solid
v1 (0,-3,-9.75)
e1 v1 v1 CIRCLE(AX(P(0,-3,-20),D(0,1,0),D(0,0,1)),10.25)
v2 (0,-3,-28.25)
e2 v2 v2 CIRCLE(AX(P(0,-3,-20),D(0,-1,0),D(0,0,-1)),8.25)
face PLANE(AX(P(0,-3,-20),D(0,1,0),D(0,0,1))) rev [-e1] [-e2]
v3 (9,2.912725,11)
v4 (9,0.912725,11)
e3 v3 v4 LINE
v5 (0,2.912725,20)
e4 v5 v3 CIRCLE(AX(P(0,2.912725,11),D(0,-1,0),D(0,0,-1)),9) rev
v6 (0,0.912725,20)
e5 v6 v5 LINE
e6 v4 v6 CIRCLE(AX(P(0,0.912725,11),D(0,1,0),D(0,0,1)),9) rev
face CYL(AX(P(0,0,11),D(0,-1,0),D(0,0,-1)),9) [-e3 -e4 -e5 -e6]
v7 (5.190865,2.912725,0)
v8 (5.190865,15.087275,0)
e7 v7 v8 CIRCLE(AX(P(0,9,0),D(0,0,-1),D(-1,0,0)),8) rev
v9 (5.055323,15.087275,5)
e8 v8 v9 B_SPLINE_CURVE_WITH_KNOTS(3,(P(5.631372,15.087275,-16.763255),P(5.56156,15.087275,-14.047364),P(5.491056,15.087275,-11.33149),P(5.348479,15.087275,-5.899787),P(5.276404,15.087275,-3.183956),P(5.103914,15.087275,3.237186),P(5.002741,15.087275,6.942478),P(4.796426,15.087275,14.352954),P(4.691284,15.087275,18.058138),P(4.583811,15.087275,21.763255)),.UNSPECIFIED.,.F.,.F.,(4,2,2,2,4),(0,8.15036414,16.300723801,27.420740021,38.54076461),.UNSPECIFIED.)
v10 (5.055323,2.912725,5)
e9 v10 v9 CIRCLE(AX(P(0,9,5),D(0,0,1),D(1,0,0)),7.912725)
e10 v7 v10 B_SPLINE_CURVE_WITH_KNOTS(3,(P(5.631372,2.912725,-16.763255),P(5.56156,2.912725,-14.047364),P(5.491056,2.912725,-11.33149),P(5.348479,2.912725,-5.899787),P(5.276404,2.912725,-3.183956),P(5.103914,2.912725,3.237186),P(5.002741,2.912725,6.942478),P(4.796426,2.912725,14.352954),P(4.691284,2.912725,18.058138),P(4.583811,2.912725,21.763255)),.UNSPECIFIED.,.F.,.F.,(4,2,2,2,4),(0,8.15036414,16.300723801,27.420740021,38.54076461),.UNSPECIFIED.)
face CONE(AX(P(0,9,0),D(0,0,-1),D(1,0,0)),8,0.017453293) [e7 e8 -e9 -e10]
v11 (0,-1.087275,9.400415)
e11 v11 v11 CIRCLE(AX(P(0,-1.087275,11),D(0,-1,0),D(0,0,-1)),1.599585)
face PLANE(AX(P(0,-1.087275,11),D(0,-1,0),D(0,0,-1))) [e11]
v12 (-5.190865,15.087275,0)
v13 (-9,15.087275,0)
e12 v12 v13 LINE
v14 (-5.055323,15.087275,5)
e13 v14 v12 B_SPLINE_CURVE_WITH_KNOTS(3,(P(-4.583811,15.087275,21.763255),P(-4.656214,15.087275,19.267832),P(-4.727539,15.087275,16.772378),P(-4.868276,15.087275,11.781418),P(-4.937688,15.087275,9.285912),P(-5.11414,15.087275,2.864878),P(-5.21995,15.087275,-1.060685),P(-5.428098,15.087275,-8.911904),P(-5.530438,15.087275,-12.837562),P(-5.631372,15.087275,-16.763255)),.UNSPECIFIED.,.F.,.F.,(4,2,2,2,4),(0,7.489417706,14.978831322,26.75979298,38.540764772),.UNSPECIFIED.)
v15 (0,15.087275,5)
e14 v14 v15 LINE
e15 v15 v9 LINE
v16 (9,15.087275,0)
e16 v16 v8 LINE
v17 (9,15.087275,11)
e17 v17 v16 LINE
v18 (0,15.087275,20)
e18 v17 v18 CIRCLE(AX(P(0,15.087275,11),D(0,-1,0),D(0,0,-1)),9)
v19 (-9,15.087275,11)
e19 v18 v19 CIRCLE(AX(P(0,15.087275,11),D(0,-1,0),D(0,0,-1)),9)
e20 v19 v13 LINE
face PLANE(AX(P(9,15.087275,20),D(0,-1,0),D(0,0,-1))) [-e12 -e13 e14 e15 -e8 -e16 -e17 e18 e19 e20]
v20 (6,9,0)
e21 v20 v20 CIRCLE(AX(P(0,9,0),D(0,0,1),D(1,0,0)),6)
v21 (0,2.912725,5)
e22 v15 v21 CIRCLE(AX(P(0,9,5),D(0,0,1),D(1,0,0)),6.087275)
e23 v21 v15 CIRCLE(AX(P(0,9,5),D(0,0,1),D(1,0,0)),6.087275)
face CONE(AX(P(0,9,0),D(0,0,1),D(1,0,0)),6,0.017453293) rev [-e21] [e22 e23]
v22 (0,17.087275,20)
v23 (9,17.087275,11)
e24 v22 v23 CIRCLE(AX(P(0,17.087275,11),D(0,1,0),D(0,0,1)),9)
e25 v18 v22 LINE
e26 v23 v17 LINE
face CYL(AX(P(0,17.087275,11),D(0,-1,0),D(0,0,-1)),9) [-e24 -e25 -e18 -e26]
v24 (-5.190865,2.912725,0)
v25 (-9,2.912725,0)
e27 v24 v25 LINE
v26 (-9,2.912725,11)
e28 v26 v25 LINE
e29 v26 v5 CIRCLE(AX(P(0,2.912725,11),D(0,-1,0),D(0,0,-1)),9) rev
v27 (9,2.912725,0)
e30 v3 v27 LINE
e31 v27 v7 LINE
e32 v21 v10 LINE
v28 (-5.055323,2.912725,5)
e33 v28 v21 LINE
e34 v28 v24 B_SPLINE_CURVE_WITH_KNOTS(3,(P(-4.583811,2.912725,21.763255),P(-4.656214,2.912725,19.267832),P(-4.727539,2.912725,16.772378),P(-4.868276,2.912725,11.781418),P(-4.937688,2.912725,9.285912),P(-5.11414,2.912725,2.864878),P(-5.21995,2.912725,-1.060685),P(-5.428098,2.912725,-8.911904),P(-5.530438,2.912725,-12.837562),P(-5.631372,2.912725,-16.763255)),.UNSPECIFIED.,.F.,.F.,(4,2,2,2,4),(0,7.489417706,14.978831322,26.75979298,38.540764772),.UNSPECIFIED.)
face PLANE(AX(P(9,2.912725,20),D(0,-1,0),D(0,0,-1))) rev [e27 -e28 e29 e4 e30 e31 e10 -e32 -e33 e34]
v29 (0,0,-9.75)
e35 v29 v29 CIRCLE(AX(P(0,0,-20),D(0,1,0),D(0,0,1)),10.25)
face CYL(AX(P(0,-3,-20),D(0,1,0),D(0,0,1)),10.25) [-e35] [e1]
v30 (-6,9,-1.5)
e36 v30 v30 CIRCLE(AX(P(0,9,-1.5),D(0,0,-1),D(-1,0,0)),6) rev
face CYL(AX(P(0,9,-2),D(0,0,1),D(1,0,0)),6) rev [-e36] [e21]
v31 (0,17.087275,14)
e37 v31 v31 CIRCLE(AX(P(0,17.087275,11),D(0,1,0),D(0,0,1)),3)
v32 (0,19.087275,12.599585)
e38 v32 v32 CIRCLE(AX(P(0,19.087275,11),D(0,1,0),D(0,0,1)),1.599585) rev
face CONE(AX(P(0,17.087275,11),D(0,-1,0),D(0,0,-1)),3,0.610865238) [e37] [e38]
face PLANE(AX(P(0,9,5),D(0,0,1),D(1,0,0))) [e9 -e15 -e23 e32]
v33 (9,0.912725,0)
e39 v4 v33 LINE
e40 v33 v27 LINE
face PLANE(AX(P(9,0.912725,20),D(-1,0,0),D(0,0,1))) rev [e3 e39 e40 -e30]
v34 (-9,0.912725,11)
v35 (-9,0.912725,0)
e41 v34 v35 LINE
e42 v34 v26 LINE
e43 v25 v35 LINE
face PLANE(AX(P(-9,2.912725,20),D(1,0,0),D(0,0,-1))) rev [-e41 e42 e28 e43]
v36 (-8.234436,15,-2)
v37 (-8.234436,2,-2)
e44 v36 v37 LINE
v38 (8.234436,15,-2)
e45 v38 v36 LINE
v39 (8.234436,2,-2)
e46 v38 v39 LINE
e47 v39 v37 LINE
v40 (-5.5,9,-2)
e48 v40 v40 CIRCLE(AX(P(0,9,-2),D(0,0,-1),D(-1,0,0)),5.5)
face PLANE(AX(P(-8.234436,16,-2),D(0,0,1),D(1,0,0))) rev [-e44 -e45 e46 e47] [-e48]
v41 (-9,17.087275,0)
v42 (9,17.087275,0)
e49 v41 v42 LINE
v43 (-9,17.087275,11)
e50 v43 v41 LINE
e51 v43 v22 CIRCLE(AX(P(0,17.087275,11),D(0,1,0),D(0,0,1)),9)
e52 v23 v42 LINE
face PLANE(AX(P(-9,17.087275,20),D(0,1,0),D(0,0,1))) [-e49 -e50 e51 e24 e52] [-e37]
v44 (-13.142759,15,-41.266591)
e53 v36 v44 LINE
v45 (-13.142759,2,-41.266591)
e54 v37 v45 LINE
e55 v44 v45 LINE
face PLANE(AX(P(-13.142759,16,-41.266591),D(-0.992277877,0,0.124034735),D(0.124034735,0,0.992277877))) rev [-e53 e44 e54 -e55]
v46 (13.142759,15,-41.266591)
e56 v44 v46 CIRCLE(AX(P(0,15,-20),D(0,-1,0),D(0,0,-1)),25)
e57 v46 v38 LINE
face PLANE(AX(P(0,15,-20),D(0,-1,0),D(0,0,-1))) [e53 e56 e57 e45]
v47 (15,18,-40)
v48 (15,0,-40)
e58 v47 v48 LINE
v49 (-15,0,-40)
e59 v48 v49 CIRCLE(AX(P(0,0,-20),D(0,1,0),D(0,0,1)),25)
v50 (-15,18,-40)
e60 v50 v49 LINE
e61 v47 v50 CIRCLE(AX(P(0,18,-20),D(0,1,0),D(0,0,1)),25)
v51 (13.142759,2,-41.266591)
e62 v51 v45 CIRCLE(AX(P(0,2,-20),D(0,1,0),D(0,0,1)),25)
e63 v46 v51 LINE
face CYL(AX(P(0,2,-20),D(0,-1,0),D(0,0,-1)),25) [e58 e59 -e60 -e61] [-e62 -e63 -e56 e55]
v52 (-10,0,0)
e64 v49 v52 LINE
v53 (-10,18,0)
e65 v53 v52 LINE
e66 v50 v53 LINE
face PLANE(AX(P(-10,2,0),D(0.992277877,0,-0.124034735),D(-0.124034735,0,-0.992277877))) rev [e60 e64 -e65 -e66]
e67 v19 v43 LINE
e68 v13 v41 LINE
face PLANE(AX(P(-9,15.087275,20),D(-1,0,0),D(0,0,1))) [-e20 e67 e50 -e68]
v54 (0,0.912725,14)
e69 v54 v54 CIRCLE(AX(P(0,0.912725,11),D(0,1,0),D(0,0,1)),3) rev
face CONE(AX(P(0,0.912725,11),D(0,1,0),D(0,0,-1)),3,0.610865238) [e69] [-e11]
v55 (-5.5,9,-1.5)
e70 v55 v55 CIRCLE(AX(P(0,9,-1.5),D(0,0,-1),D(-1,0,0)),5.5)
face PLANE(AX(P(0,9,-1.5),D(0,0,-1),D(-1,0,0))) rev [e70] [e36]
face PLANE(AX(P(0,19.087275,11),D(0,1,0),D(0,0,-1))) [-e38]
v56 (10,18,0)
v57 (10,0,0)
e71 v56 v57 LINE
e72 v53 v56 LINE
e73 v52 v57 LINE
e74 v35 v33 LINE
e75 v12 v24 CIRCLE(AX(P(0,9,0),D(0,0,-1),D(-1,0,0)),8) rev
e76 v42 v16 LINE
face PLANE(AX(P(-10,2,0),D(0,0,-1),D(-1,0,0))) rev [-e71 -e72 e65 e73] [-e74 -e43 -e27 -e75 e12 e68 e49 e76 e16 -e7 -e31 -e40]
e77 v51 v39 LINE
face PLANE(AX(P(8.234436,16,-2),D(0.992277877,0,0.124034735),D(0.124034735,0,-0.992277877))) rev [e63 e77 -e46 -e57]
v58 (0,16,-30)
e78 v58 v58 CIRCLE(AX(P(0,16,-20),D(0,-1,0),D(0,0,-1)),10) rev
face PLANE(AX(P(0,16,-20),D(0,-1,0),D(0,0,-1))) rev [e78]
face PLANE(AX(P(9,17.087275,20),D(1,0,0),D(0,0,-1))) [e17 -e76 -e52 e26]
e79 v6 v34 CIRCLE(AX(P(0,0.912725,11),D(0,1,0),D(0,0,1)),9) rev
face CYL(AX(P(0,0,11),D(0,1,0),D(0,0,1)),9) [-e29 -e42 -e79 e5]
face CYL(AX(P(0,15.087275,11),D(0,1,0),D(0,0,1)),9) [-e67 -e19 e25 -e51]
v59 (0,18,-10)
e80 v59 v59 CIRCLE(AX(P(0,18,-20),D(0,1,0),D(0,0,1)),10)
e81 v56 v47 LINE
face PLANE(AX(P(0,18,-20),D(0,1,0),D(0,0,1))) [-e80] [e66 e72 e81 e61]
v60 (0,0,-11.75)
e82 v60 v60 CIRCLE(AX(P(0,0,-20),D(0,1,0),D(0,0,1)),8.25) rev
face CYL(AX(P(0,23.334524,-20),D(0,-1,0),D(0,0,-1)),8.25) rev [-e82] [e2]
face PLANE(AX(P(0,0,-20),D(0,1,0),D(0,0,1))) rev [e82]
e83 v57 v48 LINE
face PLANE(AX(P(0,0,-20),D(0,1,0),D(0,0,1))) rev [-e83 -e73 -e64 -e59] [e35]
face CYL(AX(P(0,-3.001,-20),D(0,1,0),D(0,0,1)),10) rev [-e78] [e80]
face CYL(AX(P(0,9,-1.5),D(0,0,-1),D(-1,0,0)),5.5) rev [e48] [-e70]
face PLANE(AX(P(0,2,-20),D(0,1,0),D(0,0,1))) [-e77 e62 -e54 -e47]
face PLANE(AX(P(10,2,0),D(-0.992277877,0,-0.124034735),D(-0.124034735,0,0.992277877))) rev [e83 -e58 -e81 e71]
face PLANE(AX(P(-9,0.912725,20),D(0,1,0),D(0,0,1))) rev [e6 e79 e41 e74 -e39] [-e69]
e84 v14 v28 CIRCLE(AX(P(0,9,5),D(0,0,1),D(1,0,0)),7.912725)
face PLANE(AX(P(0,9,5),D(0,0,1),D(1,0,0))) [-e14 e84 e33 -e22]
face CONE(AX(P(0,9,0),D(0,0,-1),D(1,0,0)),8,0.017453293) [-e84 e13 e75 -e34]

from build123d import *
from build123d.topology import SkipClean

# Parameters (mm, degrees)
BOSS_EXTRUDE1_DEPTH  = 2
BOSS_EXTRUDE2_DEPTH  = 14
BOSS_EXTRUDE3_DEPTH  = 2
SKETCH5_R            = 6
CUT_EXTRUDE1_DEPTH   = 2
SKETCH6_R            = 8
SKETCH6_R_2          = 6
EXTRUDE_THIN1_DEPTH  = 5
EXTRUDE_THIN1_DRAFT  = 1
BOSS_EXTRUDE4_START  = -0.5
SKETCH7_R            = 6
SKETCH7_R_2          = 5.5
BOSS_EXTRUDE4_DEPTH  = 0.5
SKETCH16_W           = 18
SKETCH16_H           = 2
BOSS_EXTRUDE8_DEPTH  = 20
FILLET1_R            = 9
SKETCH17_R           = 3
BOSS_EXTRUDE9_DEPTH  = 2
BOSS_EXTRUDE9_TAPER  = 35
FILLET1_OF_MIRROR2_R = 9
SKETCH8_R            = 10.25
BOSS_EXTRUDE10_DEPTH = 3
SKETCH18_R           = 8.25
CUT_EXTRUDE2_DEPTH   = 3
CUT_EXTRUDE3_REACH   = 53.875
SKETCH19_R           = 10
BOSS_EXTRUDE11_START = 1
BOSS_EXTRUDE11_DEPTH = 1


with BuildPart() as part:
    # Sketch2 → Boss-Extrude1 (new body)
    with BuildSketch(Plane(origin=(0, 0, 0), x_dir=(1, 0, 0), z_dir=(0, 1, 0))):
        with BuildLine():
            Line((-10, 0), (10, 0))
            Line((10, 0), (15, 40))
            ThreePointArc((15, 40), (0, 45), (-15, 40))
            Line((-15, 40), (-10, 0))
        make_face()
    extrude(amount=BOSS_EXTRUDE1_DEPTH)

    # Sketch3 → Boss-Extrude2 (add)
    with SkipClean():  # the faces are left unmerged after this step: merging them gives an invalid solid
        with BuildSketch(Plane(origin=(0, 2, 0), x_dir=(1, 0, 0), z_dir=(0, 1, 0))):
            with BuildLine():
                Line((-13.142759388, 41.266590598), (-8.234435563, 2))
                Line((-8.234435563, 2), (8.234435563, 2))
                Line((8.234435563, 2), (13.142759388, 41.266590598))
                ThreePointArc((13.142759388, 41.266590598), (14.085623501, 40.654181431), (15, 40))
                Line((15, 40), (10, 0))
                Line((10, 0), (-10, 0))
                Line((-10, 0), (-15, 40))
                ThreePointArc((-15, 40), (-14.085623501, 40.654181431), (-13.142759388, 41.266590598))
            make_face()
        extrude(amount=BOSS_EXTRUDE2_DEPTH)

    # Sketch4 → Boss-Extrude3 (add)
    with SkipClean():  # the faces are left unmerged after this step: merging them gives an invalid solid
        with BuildSketch(Plane(origin=(0, 16, 0), x_dir=(1, 0, 0), z_dir=(0, 1, 0))):
            with BuildLine():
                Line((-15, 40), (-10, 0))
                Line((-10, 0), (10, 0))
                Line((10, 0), (15, 40))
                ThreePointArc((15, 40), (0, 45), (-15, 40))
            make_face()
        extrude(amount=BOSS_EXTRUDE3_DEPTH)

    # Sketch5 → Cut-Extrude1 (cut)
    with SkipClean():  # the faces are left unmerged after this step: merging them gives an invalid solid
        with BuildSketch(Plane.XY):
            with Locations((0, 9)):
                Circle(SKETCH5_R)
        extrude(amount=-CUT_EXTRUDE1_DEPTH, mode=Mode.SUBTRACT)


with BuildPart() as extrude_thin1_tool:
    # Sketch6 → Extrude-Thin1 (with draft: the straight prism first)
    with BuildSketch(Plane.XY):
        with Locations((0, 9)):
            Circle(SKETCH6_R)
        with Locations((0, 9)):
            Circle(SKETCH6_R_2, mode=Mode.SUBTRACT)
    extrude(amount=EXTRUDE_THIN1_DEPTH)
    # Extrude-Thin1: the draft: its side faces are tilted about the plane it starts from
    extrude_thin1_sides = [extrude_thin1_tool.faces().sort_by_distance(p)[0] for p in [
        (-8, 9, 2.5),
        (-6, 9, 2.5),
    ]]
    draft(extrude_thin1_sides, Plane.XY, EXTRUDE_THIN1_DRAFT)


with BuildPart() as part_1:
    add(part.part)

    # Extrude-Thin1: add extrude_thin1_tool
    add(extrude_thin1_tool.part)

    # Sketch7 → Boss-Extrude4 (add)
    with SkipClean():  # the faces are left unmerged after this step: merging them gives an invalid solid
        with BuildSketch(Plane(origin=(0, 0, -2), x_dir=(-1, 0, 0), z_dir=(0, 0, -1)).offset(BOSS_EXTRUDE4_START)):
            with Locations(Location((0, 9, 0), (0, 0, 180))):
                Circle(SKETCH7_R)
            with Locations((0, 9)):
                Circle(SKETCH7_R_2, mode=Mode.SUBTRACT)
        extrude(amount=BOSS_EXTRUDE4_DEPTH)

    # Sketch16 → Boss-Extrude8 (add)
    with SkipClean():  # the faces are left unmerged after this step: merging them gives an invalid solid
        with BuildSketch(Plane.XY):
            with Locations((0, 1.912724675)):
                Rectangle(SKETCH16_W, SKETCH16_H)
        boss_extrude8 = extrude(amount=BOSS_EXTRUDE8_DEPTH)

    # Fillet1
    fillet1_edges = [part_1.edges().sort_by_distance(p)[0] for p in [
        (-9, 1.912724675, 20),
        (9, 1.912724675, 20),
    ]]
    fillet(fillet1_edges, radius=FILLET1_R - 0.0001)  # a hair under: the kernel refuses the full size

    # Sketch17 → Boss-Extrude9 (add)
    with BuildSketch(Plane.XZ.offset(-0.912724675)):
        with Locations((0, 11)):
            Circle(SKETCH17_R)
    boss_extrude9 = extrude(amount=BOSS_EXTRUDE9_DEPTH, taper=BOSS_EXTRUDE9_TAPER)

    # Mirror2: Boss-Extrude8, Boss-Extrude9 across plane
    add(boss_extrude8.mirror(Plane(origin=(0, 9, 0), x_dir=(0, 0, 1), z_dir=(0, -1, 0))))
    add(boss_extrude9.mirror(Plane(origin=(0, 9, 0), x_dir=(0, 0, 1), z_dir=(0, -1, 0))))

    # Fillet1 of Mirror2
    fillet1_of_mirror2_edges = [part_1.edges().sort_by_distance(p)[0] for p in [
        (-9, 16.087275325, 20),
        (9, 16.087275325, 20),
    ]]
    fillet(fillet1_of_mirror2_edges, radius=FILLET1_OF_MIRROR2_R - 0.0001)  # a hair under: the kernel refuses the full size

    # Sketch8 → Boss-Extrude10 (add)
    with BuildSketch(Plane(origin=(0, 0, 0), x_dir=(1, 0, 0), z_dir=(0, 1, 0))):
        with Locations(Location((0, 20, 0), (0, 0, 270))):
            Circle(SKETCH8_R)
    extrude(amount=-BOSS_EXTRUDE10_DEPTH)

    # Sketch18 → Cut-Extrude2 (cut)
    with BuildSketch(Plane(origin=(0, -3, 0), x_dir=(-1, 0, 0), z_dir=(0, -1, 0))):
        with Locations(Location((0, 20, 0), (0, 0, 90))):
            Circle(SKETCH18_R)
    extrude(amount=-CUT_EXTRUDE2_DEPTH, mode=Mode.SUBTRACT)

    # Sketch19 → Cut-Extrude3 (cut, up to next)
    with BuildSketch(Plane(origin=(0, 18, 0), x_dir=(1, 0, 0), z_dir=(0, 1, 0)), mode=Mode.PRIVATE) as cut_extrude3_sk1:
        with Locations(Location((0, 20, 0), (0, 0, 270))):
            Circle(SKETCH19_R)
    cut_extrude3_tool1 = extrude(cut_extrude3_sk1.sketch, amount=-CUT_EXTRUDE3_REACH, mode=Mode.PRIVATE) & part_1.part
    add(cut_extrude3_tool1.solids().sort_by_distance((0, 18, -20))[0], mode=Mode.SUBTRACT)

    # Sketch20 → Boss-Extrude11 (add)
    with BuildSketch(Plane.XZ.offset(-16).offset(BOSS_EXTRUDE11_START)):
        with BuildLine():
            Line((13.142759388, -41.266590598), (8.234435563, -2))
            Line((8.234435563, -2), (-8.234435563, -2))
            Line((-8.234435563, -2), (-13.142759388, -41.266590598))
            ThreePointArc((-13.142759388, -41.266590598), (0, -45), (13.142759388, -41.266590598))
        make_face()
    extrude(amount=-BOSS_EXTRUDE11_DEPTH)


solid = part_1.part
